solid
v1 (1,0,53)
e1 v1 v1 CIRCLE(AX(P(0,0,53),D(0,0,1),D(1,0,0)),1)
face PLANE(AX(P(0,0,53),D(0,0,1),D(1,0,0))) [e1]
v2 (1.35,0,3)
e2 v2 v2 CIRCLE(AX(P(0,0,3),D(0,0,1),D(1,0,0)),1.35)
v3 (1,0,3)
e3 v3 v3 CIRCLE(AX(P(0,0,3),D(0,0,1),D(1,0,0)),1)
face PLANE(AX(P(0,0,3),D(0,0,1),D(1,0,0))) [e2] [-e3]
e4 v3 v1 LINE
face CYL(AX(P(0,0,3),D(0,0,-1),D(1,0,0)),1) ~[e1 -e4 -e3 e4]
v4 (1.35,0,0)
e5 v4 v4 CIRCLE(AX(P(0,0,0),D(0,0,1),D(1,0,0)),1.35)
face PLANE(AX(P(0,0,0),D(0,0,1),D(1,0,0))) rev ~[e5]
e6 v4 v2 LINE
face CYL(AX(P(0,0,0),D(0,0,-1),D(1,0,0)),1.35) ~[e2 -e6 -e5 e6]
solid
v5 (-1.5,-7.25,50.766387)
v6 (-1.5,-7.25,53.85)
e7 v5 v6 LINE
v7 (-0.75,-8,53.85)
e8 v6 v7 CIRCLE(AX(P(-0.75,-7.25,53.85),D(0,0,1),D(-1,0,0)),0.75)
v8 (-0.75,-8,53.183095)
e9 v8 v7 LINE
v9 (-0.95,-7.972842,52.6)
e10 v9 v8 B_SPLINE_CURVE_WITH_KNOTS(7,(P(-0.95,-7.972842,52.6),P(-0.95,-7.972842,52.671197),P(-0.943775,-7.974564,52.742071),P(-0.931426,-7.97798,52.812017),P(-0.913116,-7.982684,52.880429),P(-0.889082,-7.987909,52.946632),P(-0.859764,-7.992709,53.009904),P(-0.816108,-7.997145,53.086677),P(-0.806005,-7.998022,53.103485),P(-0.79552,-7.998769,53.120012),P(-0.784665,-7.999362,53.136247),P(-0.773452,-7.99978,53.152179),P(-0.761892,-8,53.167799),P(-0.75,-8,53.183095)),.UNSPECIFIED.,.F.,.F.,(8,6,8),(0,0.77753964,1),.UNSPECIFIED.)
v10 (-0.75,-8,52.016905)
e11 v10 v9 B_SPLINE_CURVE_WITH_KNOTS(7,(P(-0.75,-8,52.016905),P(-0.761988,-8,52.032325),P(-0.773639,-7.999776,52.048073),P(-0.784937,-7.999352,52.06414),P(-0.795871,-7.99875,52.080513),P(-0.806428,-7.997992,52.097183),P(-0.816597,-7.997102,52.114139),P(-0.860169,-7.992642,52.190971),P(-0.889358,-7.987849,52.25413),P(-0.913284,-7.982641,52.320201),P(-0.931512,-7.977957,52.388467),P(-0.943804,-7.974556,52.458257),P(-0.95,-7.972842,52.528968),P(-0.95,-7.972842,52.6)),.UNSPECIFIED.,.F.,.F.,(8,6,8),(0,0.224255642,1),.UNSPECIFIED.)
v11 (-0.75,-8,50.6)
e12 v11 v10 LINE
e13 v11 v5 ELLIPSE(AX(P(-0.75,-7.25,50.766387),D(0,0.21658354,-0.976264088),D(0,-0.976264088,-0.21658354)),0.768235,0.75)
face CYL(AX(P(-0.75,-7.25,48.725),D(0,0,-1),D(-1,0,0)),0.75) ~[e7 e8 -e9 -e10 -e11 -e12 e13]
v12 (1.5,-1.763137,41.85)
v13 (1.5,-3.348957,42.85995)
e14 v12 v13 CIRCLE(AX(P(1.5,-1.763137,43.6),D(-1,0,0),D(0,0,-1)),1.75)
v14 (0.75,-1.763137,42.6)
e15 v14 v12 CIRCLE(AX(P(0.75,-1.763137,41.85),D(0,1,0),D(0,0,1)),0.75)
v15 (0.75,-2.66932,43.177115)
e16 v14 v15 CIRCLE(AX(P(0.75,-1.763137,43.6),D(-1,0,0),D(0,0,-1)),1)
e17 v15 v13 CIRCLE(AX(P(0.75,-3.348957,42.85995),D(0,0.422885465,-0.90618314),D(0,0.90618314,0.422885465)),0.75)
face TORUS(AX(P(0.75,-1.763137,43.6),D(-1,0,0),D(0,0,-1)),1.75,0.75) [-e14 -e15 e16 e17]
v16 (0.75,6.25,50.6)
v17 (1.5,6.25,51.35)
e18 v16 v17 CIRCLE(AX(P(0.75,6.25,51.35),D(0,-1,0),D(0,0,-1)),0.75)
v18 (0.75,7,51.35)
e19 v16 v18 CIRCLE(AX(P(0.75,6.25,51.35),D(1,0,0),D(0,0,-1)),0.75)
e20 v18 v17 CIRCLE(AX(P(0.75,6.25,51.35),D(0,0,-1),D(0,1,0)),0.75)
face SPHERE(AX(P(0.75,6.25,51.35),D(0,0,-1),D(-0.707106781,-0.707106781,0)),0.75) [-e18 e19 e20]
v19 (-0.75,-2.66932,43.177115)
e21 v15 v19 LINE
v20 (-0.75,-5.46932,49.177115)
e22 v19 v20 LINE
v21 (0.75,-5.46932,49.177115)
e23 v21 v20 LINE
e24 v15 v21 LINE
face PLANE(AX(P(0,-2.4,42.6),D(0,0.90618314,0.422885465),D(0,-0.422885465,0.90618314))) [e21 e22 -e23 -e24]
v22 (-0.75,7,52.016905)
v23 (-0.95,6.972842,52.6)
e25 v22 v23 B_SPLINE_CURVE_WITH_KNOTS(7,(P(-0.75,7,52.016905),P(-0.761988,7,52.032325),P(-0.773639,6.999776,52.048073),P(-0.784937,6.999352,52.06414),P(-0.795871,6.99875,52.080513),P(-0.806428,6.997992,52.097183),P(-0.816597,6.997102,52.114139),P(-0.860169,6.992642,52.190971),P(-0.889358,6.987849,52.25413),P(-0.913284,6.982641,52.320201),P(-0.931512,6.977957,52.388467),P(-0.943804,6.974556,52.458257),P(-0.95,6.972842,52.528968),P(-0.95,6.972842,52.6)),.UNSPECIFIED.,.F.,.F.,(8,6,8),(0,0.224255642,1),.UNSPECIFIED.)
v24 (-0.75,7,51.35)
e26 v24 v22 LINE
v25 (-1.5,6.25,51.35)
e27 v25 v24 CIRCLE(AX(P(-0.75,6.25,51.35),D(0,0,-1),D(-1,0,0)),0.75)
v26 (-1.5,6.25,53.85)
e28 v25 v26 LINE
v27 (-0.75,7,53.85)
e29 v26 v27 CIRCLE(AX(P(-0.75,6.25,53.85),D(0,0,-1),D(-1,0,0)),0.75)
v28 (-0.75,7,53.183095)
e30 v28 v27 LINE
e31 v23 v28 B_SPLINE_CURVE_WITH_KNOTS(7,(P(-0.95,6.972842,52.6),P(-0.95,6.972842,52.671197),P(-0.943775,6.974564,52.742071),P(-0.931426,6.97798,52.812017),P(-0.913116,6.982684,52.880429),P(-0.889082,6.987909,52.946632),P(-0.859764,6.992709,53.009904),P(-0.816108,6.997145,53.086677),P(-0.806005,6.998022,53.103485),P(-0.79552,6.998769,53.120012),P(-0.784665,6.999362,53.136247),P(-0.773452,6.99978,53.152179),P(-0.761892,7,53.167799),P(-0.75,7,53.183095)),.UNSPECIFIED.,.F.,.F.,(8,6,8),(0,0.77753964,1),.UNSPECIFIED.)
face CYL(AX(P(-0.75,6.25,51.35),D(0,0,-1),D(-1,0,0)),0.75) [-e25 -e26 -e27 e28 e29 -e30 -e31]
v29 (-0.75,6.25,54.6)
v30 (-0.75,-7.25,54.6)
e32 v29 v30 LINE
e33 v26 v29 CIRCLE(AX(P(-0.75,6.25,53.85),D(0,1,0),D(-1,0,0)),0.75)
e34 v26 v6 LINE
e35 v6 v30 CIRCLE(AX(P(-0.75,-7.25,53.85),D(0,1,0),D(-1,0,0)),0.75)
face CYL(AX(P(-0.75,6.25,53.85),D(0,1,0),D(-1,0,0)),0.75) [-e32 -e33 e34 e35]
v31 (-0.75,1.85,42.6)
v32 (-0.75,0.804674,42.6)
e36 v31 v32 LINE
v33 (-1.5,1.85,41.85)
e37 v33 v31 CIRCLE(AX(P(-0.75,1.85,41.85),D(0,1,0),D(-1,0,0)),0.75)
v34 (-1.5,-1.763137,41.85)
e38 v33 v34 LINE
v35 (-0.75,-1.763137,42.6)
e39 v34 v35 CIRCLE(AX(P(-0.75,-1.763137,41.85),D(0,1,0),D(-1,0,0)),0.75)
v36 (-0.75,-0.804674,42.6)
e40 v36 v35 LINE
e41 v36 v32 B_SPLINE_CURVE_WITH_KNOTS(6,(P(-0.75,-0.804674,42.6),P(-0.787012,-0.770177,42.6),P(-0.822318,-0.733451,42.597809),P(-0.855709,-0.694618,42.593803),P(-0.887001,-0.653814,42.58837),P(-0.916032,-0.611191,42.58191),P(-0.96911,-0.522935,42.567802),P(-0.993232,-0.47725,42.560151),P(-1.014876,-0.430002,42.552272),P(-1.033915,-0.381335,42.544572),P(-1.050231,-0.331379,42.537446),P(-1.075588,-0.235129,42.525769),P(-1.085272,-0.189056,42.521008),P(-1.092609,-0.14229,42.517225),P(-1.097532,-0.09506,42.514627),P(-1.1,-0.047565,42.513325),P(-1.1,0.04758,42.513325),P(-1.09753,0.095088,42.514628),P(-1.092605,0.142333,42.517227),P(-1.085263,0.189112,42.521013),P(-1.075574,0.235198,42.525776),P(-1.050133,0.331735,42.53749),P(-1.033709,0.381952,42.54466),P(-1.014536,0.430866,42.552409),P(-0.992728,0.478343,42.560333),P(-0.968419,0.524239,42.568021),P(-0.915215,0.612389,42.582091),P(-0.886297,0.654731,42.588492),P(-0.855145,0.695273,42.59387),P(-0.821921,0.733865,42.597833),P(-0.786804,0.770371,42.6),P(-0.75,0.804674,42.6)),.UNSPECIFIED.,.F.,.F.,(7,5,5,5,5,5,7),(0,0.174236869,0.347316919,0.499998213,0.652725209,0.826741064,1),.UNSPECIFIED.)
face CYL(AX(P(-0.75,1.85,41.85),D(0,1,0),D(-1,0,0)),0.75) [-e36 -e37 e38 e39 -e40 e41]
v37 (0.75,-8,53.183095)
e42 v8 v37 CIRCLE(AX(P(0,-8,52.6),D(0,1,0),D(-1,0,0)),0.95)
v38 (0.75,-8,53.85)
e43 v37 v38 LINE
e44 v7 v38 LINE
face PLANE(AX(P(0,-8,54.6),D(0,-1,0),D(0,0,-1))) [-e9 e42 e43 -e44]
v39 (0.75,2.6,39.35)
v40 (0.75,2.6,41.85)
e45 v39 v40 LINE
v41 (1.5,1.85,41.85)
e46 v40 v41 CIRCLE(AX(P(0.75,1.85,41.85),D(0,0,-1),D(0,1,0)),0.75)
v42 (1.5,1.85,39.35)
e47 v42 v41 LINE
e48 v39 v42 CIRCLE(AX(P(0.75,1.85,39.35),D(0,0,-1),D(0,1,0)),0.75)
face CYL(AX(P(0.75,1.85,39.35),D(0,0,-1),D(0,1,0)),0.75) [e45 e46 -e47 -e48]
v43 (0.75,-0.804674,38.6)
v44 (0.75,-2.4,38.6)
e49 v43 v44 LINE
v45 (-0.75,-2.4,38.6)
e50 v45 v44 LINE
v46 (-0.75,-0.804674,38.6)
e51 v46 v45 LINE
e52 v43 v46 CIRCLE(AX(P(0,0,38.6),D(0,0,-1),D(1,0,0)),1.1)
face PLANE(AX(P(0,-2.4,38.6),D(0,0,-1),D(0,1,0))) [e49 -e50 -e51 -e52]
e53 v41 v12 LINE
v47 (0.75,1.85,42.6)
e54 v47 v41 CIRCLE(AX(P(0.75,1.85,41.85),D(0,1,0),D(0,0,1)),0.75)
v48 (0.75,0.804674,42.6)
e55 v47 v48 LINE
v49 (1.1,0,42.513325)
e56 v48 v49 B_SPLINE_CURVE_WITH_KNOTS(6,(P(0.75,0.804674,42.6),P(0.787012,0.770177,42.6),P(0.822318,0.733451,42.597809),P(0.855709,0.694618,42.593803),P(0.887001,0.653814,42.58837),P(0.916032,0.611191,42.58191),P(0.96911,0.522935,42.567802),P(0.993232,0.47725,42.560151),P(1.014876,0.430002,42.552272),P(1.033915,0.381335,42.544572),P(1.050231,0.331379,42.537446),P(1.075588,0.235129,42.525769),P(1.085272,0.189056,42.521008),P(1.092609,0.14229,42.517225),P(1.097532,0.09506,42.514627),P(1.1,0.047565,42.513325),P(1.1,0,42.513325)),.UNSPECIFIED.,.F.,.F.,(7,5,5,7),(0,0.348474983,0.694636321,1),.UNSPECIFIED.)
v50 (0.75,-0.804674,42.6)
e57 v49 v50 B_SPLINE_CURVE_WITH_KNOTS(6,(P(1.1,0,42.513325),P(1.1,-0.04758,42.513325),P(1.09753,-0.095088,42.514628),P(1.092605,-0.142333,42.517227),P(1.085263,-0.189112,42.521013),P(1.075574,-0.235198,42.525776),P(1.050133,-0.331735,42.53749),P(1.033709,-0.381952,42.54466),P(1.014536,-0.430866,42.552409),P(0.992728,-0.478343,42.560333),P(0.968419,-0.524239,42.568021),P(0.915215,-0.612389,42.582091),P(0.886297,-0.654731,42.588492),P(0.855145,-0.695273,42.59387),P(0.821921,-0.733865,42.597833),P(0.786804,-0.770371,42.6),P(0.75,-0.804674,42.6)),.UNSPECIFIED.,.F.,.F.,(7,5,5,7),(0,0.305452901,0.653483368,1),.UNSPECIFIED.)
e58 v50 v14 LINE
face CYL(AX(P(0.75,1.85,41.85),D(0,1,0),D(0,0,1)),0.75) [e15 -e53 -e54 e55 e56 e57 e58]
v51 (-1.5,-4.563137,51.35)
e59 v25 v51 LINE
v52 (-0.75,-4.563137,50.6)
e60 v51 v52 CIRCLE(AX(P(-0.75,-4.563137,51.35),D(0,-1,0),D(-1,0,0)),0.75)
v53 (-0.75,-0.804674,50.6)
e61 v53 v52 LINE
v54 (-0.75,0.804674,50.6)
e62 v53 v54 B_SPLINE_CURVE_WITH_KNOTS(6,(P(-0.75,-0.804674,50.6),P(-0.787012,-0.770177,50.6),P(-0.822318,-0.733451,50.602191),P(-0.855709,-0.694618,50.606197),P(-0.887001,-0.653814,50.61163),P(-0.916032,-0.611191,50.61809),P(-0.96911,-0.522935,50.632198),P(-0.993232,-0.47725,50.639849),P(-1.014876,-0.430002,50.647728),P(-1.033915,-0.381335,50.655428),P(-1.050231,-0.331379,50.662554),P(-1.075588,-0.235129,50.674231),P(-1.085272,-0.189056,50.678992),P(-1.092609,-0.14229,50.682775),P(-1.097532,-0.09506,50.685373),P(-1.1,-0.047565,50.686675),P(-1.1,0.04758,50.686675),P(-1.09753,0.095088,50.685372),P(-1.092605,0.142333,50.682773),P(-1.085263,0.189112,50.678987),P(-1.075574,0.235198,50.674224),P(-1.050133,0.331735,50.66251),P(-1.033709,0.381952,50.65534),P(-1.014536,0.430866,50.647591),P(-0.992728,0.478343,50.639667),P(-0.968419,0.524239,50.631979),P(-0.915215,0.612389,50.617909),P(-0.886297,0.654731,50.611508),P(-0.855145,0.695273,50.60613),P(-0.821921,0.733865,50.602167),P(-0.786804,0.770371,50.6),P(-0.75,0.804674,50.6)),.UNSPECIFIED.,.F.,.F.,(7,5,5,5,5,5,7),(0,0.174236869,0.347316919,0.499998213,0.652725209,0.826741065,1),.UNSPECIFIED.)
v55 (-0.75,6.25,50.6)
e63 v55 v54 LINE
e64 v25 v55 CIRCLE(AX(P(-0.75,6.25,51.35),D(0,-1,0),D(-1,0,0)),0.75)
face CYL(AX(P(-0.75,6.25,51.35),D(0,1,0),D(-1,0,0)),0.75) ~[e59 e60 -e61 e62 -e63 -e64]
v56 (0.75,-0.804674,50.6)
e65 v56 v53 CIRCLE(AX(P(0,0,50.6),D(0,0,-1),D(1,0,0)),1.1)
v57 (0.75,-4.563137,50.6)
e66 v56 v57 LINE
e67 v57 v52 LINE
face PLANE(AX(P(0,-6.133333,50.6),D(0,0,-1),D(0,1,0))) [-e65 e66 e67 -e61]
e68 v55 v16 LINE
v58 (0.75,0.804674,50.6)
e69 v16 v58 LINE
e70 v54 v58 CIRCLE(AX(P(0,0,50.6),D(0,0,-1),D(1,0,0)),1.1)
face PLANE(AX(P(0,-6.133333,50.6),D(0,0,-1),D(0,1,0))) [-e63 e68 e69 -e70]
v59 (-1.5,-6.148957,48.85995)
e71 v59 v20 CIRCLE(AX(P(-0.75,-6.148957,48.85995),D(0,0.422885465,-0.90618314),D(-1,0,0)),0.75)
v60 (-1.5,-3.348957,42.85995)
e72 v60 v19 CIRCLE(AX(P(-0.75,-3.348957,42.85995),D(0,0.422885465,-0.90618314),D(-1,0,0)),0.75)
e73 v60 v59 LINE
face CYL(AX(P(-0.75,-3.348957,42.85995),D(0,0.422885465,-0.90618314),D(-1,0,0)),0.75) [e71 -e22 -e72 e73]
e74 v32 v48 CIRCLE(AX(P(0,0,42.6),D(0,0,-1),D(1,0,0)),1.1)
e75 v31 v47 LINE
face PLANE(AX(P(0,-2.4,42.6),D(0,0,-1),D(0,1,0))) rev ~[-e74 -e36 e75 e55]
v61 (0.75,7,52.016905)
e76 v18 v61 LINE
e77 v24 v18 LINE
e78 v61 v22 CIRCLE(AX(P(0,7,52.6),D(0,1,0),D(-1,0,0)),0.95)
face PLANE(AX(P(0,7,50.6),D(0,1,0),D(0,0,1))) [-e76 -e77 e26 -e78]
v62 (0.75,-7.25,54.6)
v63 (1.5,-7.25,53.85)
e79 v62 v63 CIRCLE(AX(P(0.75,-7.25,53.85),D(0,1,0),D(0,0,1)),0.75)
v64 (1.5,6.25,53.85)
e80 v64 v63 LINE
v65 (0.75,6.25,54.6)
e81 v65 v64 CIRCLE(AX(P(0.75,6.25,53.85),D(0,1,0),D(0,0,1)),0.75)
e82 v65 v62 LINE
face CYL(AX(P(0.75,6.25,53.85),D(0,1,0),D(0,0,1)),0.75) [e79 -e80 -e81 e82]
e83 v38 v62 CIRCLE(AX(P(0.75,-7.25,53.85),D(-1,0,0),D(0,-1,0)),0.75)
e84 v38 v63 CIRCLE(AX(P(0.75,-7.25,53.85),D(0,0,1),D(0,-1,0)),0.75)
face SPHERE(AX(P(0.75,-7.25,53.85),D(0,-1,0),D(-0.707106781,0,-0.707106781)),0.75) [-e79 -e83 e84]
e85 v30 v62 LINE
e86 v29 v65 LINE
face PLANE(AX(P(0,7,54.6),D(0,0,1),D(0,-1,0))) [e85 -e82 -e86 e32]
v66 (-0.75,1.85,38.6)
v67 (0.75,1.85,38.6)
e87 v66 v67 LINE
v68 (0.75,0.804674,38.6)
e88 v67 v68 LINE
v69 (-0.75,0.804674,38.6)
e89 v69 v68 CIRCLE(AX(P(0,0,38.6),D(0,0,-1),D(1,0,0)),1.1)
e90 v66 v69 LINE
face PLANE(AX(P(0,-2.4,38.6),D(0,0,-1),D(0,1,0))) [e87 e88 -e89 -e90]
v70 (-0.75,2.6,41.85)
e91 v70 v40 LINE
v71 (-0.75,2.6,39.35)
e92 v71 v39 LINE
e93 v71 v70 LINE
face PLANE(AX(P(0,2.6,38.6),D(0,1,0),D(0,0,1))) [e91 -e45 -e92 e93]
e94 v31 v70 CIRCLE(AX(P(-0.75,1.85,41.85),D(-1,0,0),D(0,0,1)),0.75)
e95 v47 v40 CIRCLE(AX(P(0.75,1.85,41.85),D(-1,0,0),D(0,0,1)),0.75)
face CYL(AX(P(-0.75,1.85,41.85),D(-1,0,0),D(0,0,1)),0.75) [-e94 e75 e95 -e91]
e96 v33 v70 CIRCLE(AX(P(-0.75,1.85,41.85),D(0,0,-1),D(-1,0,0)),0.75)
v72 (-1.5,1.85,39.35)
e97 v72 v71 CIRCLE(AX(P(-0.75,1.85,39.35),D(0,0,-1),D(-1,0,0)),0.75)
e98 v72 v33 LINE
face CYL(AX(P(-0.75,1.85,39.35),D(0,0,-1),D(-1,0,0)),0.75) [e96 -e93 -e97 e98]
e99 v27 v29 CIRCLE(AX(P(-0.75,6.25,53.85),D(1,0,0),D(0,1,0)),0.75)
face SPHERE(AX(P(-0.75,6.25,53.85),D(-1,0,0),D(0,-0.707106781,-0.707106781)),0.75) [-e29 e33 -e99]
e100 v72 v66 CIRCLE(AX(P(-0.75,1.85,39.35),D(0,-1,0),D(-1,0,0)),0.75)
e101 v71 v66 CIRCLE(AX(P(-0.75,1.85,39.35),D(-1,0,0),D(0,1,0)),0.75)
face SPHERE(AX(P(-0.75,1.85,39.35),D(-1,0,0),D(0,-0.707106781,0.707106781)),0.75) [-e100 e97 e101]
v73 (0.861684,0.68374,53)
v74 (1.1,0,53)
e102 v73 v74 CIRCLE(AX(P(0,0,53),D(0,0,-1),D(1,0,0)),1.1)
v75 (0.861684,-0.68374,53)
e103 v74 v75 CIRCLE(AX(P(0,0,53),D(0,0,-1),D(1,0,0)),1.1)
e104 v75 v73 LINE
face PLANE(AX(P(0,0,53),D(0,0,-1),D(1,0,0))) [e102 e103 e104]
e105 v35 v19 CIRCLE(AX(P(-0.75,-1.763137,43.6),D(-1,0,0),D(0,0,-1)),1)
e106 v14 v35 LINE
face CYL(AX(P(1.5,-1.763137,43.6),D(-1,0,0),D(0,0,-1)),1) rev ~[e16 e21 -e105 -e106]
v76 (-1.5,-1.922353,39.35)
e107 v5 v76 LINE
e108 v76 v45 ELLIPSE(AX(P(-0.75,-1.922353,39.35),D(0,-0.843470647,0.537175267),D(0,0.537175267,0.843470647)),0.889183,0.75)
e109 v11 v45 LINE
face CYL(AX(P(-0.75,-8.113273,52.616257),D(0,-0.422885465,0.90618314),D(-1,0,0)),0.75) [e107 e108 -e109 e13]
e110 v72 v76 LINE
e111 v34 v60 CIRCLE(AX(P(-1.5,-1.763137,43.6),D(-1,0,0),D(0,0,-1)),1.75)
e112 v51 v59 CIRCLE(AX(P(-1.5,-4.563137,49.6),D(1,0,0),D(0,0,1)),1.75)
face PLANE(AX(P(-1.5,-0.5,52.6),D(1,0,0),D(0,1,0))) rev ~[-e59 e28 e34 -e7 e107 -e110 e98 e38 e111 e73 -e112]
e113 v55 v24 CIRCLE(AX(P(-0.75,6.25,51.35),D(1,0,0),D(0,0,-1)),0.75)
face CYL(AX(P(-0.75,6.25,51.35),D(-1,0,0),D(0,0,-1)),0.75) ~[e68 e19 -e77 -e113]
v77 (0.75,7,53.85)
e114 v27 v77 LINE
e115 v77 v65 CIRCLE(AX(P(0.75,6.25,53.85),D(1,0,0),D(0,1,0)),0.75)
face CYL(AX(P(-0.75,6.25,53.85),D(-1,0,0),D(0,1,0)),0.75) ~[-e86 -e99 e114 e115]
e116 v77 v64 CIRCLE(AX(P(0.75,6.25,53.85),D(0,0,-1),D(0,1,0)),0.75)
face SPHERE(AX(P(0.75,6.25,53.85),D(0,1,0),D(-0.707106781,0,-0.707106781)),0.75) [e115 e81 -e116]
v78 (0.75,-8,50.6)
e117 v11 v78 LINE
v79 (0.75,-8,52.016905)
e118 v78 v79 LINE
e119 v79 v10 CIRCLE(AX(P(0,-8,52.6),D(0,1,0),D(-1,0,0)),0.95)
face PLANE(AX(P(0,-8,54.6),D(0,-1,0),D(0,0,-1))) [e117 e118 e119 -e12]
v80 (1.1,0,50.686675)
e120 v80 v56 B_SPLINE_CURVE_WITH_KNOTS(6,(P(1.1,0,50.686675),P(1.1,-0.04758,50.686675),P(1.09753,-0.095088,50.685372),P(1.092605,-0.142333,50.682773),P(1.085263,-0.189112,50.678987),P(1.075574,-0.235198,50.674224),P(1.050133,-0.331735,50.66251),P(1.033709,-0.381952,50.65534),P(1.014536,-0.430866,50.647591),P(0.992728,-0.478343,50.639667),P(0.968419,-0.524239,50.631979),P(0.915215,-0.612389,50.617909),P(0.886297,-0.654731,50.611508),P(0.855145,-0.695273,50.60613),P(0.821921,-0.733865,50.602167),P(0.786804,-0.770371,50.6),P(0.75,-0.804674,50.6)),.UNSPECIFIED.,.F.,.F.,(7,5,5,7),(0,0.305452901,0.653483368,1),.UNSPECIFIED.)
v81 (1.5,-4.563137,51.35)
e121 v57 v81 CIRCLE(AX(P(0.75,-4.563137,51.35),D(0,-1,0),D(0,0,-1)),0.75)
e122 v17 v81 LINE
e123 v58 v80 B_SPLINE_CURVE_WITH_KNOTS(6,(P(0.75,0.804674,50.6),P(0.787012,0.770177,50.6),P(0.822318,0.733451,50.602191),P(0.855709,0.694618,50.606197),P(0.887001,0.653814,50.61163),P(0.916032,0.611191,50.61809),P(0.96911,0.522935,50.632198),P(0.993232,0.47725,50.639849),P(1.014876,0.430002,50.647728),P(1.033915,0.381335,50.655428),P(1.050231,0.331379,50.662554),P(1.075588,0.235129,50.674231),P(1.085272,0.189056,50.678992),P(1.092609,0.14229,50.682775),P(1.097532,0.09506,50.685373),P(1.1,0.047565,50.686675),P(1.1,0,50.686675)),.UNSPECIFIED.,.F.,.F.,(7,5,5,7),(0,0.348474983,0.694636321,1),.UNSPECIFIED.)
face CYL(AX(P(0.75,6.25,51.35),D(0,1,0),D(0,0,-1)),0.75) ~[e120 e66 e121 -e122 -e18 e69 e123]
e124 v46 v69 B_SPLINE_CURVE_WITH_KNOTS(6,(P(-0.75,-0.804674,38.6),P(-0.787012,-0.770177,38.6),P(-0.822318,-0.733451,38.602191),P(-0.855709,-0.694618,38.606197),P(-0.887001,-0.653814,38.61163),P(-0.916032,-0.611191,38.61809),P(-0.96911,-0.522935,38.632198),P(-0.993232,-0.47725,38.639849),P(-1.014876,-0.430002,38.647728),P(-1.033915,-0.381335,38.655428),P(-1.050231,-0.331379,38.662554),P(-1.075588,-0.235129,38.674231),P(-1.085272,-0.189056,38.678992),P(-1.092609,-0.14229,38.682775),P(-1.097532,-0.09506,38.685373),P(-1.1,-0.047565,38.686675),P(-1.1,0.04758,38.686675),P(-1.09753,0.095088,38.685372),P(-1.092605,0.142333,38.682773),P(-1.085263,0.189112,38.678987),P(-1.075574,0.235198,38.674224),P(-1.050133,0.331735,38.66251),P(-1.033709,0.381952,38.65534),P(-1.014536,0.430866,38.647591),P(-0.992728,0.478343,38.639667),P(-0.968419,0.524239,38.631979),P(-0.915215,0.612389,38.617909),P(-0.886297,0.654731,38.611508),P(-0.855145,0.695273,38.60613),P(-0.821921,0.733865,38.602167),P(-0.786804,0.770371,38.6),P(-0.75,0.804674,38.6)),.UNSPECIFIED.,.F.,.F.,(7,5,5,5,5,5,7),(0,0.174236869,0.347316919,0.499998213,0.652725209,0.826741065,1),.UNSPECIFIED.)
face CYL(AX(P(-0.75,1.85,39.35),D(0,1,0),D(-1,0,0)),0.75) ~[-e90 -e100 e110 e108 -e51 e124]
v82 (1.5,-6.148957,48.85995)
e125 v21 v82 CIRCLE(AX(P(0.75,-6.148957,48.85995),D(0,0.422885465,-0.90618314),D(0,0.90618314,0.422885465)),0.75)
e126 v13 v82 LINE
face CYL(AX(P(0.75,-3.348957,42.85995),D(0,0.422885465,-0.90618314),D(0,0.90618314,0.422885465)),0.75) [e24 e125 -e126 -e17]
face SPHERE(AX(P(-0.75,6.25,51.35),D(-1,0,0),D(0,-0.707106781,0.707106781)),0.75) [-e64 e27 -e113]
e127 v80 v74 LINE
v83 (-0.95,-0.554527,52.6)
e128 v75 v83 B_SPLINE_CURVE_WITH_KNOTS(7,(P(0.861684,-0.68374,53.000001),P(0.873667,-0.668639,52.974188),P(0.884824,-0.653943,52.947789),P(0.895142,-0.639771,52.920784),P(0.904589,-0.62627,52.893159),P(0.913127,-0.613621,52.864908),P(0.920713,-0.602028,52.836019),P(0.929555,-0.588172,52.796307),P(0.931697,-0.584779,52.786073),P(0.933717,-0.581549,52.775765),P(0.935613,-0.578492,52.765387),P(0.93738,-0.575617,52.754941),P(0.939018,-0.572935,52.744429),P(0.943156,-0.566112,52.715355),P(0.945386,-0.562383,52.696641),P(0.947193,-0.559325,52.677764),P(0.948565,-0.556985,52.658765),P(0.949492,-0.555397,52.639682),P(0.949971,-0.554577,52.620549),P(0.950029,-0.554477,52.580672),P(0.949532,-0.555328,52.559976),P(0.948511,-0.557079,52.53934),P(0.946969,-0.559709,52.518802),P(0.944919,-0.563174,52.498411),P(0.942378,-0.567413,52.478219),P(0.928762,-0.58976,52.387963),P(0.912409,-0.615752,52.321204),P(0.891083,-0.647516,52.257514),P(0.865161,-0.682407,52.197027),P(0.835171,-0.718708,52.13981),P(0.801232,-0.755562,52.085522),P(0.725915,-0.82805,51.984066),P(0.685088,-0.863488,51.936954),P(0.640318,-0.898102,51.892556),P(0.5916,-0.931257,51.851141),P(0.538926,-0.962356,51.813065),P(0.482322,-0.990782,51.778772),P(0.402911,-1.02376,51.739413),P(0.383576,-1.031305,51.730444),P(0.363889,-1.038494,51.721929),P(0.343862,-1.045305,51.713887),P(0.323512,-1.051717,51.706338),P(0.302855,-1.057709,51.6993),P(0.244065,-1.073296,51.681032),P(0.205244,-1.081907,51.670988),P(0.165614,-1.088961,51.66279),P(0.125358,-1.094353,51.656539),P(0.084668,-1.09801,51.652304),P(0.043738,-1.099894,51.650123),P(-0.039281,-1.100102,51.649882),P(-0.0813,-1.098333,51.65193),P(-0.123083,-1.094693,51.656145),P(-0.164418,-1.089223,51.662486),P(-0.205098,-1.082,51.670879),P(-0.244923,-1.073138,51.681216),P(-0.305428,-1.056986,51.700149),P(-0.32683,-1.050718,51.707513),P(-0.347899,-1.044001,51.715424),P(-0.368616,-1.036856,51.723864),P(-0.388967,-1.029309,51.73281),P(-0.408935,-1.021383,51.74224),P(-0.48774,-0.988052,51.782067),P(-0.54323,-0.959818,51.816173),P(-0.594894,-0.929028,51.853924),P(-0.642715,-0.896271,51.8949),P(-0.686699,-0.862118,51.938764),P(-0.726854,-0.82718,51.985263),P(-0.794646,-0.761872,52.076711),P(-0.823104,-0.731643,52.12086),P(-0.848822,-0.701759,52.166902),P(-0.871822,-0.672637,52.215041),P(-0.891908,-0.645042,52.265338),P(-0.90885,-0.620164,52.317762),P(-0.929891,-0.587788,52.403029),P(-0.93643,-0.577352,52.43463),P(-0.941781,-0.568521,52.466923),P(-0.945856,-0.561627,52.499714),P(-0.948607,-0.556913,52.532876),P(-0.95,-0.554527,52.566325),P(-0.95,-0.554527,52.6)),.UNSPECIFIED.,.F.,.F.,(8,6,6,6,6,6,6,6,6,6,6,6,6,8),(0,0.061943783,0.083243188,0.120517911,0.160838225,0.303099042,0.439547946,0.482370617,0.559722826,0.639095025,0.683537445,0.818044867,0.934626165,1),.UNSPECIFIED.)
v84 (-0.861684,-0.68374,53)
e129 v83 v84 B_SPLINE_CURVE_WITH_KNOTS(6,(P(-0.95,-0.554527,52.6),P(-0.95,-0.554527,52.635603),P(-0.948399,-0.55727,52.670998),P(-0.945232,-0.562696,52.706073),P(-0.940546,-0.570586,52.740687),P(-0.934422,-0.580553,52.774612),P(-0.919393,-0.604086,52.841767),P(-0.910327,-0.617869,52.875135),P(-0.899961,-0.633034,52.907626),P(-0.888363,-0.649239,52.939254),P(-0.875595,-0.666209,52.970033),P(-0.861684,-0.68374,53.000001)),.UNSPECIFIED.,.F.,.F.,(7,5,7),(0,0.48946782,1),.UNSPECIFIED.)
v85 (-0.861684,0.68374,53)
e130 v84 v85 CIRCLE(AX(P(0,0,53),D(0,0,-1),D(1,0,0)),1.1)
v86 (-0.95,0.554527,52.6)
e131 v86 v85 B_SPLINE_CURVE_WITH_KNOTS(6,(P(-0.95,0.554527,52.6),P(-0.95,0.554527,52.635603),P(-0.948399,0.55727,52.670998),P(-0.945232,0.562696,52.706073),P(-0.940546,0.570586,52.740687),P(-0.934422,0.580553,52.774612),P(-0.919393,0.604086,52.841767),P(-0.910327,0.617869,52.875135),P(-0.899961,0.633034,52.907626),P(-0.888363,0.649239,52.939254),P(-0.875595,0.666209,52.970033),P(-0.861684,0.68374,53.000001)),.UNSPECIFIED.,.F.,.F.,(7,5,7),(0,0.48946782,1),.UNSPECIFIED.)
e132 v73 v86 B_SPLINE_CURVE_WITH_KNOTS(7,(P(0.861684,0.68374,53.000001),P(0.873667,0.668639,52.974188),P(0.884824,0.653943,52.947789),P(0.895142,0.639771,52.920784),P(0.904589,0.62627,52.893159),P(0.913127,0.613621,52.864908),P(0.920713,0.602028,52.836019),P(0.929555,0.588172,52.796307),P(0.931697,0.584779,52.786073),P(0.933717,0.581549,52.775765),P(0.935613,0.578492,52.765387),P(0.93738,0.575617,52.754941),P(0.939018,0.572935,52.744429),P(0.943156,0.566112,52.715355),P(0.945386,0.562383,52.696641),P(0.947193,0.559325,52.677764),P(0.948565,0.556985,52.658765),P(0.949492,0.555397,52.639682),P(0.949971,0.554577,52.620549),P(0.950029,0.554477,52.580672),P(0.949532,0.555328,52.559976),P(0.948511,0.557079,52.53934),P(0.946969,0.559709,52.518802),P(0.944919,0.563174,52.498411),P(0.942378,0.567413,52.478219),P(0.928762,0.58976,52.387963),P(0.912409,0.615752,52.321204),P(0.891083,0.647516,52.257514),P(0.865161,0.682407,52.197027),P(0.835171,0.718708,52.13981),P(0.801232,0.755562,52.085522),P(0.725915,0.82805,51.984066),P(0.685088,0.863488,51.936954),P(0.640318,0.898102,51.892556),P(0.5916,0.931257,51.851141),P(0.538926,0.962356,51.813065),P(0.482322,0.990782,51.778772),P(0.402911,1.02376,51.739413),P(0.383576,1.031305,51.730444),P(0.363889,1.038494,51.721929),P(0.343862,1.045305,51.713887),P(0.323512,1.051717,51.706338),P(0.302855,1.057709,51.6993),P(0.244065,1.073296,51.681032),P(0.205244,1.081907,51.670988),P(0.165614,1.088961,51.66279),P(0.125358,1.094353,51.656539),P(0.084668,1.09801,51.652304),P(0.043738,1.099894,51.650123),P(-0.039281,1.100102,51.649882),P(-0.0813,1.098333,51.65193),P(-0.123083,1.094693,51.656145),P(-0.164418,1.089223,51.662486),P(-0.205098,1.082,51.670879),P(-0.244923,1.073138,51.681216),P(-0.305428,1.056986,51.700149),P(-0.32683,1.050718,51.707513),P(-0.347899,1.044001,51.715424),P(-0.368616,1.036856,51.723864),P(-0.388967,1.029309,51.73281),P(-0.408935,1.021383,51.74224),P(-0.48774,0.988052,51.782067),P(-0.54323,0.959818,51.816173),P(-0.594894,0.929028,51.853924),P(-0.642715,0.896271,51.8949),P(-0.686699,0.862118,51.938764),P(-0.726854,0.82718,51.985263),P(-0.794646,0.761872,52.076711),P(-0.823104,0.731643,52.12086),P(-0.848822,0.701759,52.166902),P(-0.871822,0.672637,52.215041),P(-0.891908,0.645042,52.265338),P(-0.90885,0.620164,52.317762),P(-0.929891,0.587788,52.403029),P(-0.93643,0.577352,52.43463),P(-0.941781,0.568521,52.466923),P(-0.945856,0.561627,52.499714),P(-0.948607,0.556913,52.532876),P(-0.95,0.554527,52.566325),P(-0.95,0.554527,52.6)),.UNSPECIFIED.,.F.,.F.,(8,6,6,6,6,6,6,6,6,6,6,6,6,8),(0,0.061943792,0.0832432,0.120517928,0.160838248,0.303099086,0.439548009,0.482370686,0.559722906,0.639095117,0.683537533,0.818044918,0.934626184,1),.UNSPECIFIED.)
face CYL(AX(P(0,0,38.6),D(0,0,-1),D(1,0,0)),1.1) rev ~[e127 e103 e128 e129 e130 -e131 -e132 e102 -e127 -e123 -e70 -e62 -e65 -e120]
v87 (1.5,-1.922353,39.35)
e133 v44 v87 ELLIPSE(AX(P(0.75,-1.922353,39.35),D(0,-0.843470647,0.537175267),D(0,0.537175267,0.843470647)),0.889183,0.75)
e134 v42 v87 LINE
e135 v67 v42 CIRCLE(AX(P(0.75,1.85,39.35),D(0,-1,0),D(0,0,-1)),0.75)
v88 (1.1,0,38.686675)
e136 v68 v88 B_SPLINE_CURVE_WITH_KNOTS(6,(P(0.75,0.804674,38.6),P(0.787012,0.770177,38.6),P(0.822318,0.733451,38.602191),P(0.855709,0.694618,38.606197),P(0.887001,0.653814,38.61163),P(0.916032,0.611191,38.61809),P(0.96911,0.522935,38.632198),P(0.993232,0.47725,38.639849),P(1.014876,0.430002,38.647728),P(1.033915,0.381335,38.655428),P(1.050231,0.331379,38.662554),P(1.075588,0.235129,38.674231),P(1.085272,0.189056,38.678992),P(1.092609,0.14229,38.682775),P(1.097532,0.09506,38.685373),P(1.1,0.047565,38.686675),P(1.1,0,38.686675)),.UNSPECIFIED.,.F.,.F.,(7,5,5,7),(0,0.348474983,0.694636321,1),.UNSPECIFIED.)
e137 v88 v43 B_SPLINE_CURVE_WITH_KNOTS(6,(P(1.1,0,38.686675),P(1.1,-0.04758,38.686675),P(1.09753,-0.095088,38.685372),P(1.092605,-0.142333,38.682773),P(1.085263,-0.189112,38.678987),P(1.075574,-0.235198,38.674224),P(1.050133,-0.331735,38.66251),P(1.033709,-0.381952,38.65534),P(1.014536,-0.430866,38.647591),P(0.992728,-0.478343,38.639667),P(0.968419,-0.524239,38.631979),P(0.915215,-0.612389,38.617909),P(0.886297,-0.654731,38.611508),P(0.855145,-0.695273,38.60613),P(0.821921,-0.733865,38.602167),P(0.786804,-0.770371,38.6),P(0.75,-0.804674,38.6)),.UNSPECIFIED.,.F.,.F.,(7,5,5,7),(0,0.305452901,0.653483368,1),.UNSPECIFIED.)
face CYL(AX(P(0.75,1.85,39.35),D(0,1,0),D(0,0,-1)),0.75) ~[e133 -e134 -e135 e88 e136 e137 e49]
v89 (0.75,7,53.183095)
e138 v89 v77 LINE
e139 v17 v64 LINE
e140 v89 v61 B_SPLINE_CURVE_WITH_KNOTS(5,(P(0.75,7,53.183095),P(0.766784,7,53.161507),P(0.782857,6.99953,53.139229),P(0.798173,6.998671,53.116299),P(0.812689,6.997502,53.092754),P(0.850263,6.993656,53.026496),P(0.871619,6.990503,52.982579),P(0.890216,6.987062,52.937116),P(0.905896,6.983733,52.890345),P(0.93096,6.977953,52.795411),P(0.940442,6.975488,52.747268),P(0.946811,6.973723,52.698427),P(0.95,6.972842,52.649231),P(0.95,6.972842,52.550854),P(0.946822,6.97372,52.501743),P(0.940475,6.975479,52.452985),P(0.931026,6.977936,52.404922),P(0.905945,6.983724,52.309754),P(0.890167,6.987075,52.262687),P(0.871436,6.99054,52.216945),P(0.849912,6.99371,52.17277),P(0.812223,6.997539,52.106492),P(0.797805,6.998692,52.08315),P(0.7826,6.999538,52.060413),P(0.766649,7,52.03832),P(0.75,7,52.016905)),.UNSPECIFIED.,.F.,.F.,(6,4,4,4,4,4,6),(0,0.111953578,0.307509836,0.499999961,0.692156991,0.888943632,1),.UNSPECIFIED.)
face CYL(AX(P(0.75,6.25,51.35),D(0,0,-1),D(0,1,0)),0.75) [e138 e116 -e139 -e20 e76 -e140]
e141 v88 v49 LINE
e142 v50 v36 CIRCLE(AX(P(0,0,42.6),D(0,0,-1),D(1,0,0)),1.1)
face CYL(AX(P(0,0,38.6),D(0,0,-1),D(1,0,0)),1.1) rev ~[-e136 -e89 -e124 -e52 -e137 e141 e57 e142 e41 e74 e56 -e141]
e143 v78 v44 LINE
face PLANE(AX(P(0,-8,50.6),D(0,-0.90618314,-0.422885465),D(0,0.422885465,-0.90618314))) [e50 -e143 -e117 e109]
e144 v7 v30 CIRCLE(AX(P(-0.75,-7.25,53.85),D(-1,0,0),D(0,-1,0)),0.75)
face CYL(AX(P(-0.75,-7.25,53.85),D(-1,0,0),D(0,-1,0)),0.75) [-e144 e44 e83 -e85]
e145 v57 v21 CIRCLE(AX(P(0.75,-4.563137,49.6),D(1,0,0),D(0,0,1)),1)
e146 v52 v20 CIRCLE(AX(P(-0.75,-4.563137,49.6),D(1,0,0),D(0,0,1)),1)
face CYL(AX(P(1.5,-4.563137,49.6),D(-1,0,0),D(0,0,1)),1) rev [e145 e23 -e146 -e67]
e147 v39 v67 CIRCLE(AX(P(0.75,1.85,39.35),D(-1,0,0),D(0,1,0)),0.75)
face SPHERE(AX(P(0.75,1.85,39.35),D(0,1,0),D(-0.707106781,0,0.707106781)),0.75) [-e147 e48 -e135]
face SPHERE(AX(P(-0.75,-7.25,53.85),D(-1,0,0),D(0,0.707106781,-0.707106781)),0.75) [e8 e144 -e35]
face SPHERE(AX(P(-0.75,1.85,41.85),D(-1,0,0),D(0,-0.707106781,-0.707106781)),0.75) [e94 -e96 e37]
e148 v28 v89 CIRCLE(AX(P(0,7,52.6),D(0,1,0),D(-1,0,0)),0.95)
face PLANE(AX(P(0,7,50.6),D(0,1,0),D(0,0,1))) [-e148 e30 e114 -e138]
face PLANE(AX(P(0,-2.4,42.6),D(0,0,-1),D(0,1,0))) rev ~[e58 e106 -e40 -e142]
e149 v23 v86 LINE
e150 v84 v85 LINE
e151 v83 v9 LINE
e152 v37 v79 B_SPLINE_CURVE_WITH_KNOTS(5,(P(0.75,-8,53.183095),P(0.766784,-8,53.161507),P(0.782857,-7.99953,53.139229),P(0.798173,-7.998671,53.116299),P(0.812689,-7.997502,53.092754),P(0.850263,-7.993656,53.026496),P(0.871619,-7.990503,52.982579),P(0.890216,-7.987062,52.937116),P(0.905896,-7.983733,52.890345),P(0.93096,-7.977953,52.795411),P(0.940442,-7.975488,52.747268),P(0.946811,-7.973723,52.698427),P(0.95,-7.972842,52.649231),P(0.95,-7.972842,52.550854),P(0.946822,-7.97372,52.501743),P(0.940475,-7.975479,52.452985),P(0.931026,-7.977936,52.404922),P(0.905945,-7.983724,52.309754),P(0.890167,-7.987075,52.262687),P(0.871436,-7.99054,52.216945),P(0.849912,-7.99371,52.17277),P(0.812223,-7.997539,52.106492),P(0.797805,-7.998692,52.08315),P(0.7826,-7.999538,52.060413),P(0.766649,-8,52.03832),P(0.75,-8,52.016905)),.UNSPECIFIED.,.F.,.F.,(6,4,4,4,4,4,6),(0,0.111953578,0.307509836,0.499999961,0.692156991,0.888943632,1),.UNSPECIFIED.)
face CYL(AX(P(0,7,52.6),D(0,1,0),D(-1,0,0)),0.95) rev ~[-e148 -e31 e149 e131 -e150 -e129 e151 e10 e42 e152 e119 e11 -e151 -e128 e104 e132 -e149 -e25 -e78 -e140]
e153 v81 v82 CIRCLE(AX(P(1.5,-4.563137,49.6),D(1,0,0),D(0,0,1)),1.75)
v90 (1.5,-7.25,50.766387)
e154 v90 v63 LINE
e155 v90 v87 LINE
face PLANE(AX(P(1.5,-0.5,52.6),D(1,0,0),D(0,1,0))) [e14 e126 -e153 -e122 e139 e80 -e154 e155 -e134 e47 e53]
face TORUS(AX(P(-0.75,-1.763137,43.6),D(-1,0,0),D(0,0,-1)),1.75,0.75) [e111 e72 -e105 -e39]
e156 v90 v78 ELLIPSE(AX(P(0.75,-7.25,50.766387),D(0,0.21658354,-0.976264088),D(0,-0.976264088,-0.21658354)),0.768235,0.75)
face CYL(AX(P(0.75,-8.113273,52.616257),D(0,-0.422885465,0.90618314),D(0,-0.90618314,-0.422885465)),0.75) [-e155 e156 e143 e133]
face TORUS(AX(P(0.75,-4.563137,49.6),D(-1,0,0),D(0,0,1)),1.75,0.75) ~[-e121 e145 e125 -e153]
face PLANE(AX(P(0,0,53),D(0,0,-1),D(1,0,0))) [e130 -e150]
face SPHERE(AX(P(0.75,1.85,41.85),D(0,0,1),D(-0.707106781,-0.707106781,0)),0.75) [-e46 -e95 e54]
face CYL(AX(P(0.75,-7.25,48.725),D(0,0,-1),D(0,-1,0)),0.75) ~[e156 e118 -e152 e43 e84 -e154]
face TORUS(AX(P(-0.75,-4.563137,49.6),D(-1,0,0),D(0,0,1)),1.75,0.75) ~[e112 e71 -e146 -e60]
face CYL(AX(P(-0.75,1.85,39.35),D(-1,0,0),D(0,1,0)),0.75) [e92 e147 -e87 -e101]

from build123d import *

# Parameters (mm, degrees)
F0_R          = 1.35
F1_DEPTH      = 3
F2_R          = 1
F3_DEPTH      = 50
F4_W          = 5
F4_H          = 4
F5_DEPTH      = 1.5
F6_R          = 1.1
F7_DEPTH      = 14.4
F8_R          = 0.95
F9_DEPTH      = 25
F10_R         = 1
F11_T1_DEPTH  = 2.5
F11_T3_DEPTH  = 2.5
F11_T5_DEPTH  = 13.5
F11_T7_DEPTH  = 10.8131369762
F11_T9_DEPTH  = 5.125
F11_T11_DEPTH = 1.5
F11_T13_DEPTH = 16.9923562858
F11_T15_DEPTH = 6.125
F11_T17_DEPTH = 3.6131369762
F11_T19_DEPTH = 6.6211781429
F11_S23_W     = 0.75
F11_S23_H     = 0.75
F11_T24_DEPTH = 0.75
F11_S29_W     = 0.75
F11_S29_H     = 0.75
F11_T30_DEPTH = 0.75
F11_S35_W     = 0.75
F11_S35_H     = 0.75
F11_T36_DEPTH = 0.75
F11_S41_W     = 0.75
F11_S41_H     = 0.75
F11_T42_DEPTH = 0.75
F11_S47_W     = 0.75
F11_S47_H     = 0.75
F11_T48_DEPTH = 0.75
F11_S53_W     = 0.75
F11_S53_H     = 0.75
F11_T54_DEPTH = 0.75
F11_S59_W     = 0.75
F11_S59_H     = 0.75
F11_T60_DEPTH = 0.75
F11_S65_W     = 0.75
F11_S65_H     = 0.75
F11_T66_DEPTH = 0.75
F11_S71_W     = 0.75
F11_S71_H     = 0.75
F11_T72_DEPTH = 0.75
F11_S77_W     = 0.75
F11_S77_H     = 0.75
F11_T78_DEPTH = 0.75
F11_T82_ANGLE = 64.9831065219
F11_T84_ANGLE = 115.0168934781
F11_T86_ANGLE = 64.9831065219
F11_T88_ANGLE = 115.0168934781


# Not quite as in the source:
# - a fillet or chamfer that OpenCascade refuses, or shapes differently, is made with other operations: its cross-section is extruded or revolved along the edge and cut away or added


with BuildPart() as f1:
    # F0 (on Top) → F1 (new body)
    with BuildSketch(Plane.XY):
        Circle(F0_R)
    extrude(amount=F1_DEPTH)

    # F2 (on face) → F3 (join)
    with BuildSketch(Plane.XY.offset(3)):
        Circle(F2_R)
    extrude(amount=F3_DEPTH)


with BuildPart() as f5:
    # F4 (on Right) → F5 (new body, symmetric)
    with BuildSketch(Plane.YZ):
        Polygon((7, 50.6), (7, 54.6), (-8, 54.6), (-8, 50.6), (-6.1333333333, 50.6), align=None)
        with Locations((0.1, 40.6)):
            Rectangle(F4_W, F4_H)
        Polygon((-6.1333333333, 50.6), (-8, 50.6), (-2.4, 38.6), (-2.4, 42.6), align=None)
    extrude(amount=F5_DEPTH, both=True)

    # F6 (on face) → F7 (cut, through all)
    with BuildSketch(Plane(origin=(0, 0, 38.6), x_dir=(1, 0, 0), z_dir=(0, 0, -1))):
        Circle(F6_R)
    extrude(amount=-F7_DEPTH, mode=Mode.SUBTRACT)

    # F8 (on face) → F9 (cut)
    with BuildSketch(Plane(origin=(0, 7, 0), x_dir=(-1, 0, 0), z_dir=(0, 1, 0))):
        with Locations((0, 52.6)):
            Circle(F8_R)
    extrude(amount=-F9_DEPTH, mode=Mode.SUBTRACT)

    # F10
    f10_edges = [f5.edges().sort_by_distance(p)[0] for p in [
        (0, -6.133333, 50.6),
        (0, -2.4, 42.6),
    ]]
    fillet(f10_edges, radius=F10_R)

    # F11: fillet of radius 0.75 on 27 edges, made by hand

    # F11_s2 → F11_t1 (cut)
    with BuildSketch(Plane.XY.offset(39.35)):
        with BuildLine():
            ThreePointArc((-1.5, 1.85), (-1.2803300859, 2.3803300859), (-0.75, 2.6))
            Line((-0.75, 2.6), (-1.5, 2.6))
            Line((-1.5, 2.6), (-1.5, 1.85))
        make_face()
        with BuildLine():
            ThreePointArc((0.75, 2.6), (1.2803300859, 2.3803300859), (1.5, 1.85))
            Line((1.5, 1.85), (1.5, 2.6))
            Line((1.5, 2.6), (0.75, 2.6))
        make_face()
    extrude(amount=F11_T1_DEPTH, mode=Mode.SUBTRACT)

    # F11_s4 → F11_t3 (cut)
    with BuildSketch(Plane.XY.offset(51.35)):
        with BuildLine():
            ThreePointArc((-1.5, 6.25), (-1.2803300859, 6.7803300859), (-0.75, 7))
            Line((-0.75, 7), (-1.5, 7))
            Line((-1.5, 7), (-1.5, 6.25))
        make_face()
        with BuildLine():
            ThreePointArc((0.75, 7), (1.2803300859, 6.7803300859), (1.5, 6.25))
            Line((1.5, 6.25), (1.5, 7))
            Line((1.5, 7), (0.75, 7))
        make_face()
    extrude(amount=F11_T3_DEPTH, mode=Mode.SUBTRACT)

    # F11_s6 → F11_t5 (cut)
    with BuildSketch(Plane.XZ.offset(-6.25)):
        with BuildLine():
            ThreePointArc((-1.5, 53.85), (-1.2803300859, 54.3803300859), (-0.75, 54.6))
            Line((-0.75, 54.6), (-1.5, 54.6))
            Line((-1.5, 54.6), (-1.5, 53.85))
        make_face()
        with BuildLine():
            ThreePointArc((0.75, 54.6), (1.2803300859, 54.3803300859), (1.5, 53.85))
            Line((1.5, 53.85), (1.5, 54.6))
            Line((1.5, 54.6), (0.75, 54.6))
        make_face()
    extrude(amount=F11_T5_DEPTH, mode=Mode.SUBTRACT)

    # F11_s8 → F11_t7 (cut)
    with BuildSketch(Plane.XZ.offset(-6.25)):
        with BuildLine():
            ThreePointArc((-1.5, 51.35), (-1.2803300859, 50.8196699141), (-0.75, 50.6))
            Line((-0.75, 50.6), (-1.5, 50.6))
            Line((-1.5, 50.6), (-1.5, 51.35))
        make_face()
        with BuildLine():
            ThreePointArc((0.75, 50.6), (1.2803300859, 50.8196699141), (1.5, 51.35))
            Line((1.5, 51.35), (1.5, 50.6))
            Line((1.5, 50.6), (0.75, 50.6))
        make_face()
    extrude(amount=F11_T7_DEPTH, mode=Mode.SUBTRACT)

    # F11_s10 → F11_t9 (cut)
    with BuildSketch(Plane.XY.offset(48.725)):
        with BuildLine():
            ThreePointArc((-1.5, -7.25), (-1.2803300859, -7.7803300859), (-0.75, -8))
            Line((-0.75, -8), (-1.5, -8))
            Line((-1.5, -8), (-1.5, -7.25))
        make_face()
        with BuildLine():
            ThreePointArc((0.75, -8), (1.2803300859, -7.7803300859), (1.5, -7.25))
            Line((1.5, -7.25), (1.5, -8))
            Line((1.5, -8), (0.75, -8))
        make_face()
    extrude(amount=F11_T9_DEPTH, mode=Mode.SUBTRACT)

    # F11_s12 → F11_t11 (cut)
    with BuildSketch(Plane.YZ.offset(-0.75)):
        with BuildLine():
            ThreePointArc((-8, 53.85), (-7.7803300859, 54.3803300859), (-7.25, 54.6))
            Line((-7.25, 54.6), (-8, 54.6))
            Line((-8, 54.6), (-8, 53.85))
        make_face()
        with BuildLine():
            ThreePointArc((7, 53.85), (6.7803300859, 54.3803300859), (6.25, 54.6))
            Line((6.25, 54.6), (7, 54.6))
            Line((7, 54.6), (7, 53.85))
        make_face()
        with BuildLine():
            ThreePointArc((6.25, 50.6), (6.7803300859, 50.8196699141), (7, 51.35))
            Line((7, 51.35), (7, 50.6))
            Line((7, 50.6), (6.25, 50.6))
        make_face()
        with BuildLine():
            ThreePointArc((2.6, 39.35), (2.3803300859, 38.8196699141), (1.85, 38.6))
            Line((1.85, 38.6), (2.6, 38.6))
            Line((2.6, 38.6), (2.6, 39.35))
        make_face()
        with BuildLine():
            ThreePointArc((1.85, 42.6), (2.3803300859, 42.3803300859), (2.6, 41.85))
            Line((2.6, 41.85), (2.6, 42.6))
            Line((2.6, 42.6), (1.85, 42.6))
        make_face()
    extrude(amount=F11_T11_DEPTH, mode=Mode.SUBTRACT)

    # F11_s14 → F11_t13 (cut)
    with BuildSketch(Plane(origin=(0, -21.6140781307, 46.3158817087), x_dir=(1, 0, 0), z_dir=(0, 0.4228854653, -0.90618314))):
        with BuildLine():
            ThreePointArc((-1.5, -14.8985394258), (-1.2803300859, -14.3682093399), (-0.75, -14.1485394258))
            Line((-0.75, -14.1485394258), (-1.5, -14.1485394258))
            Line((-1.5, -14.1485394258), (-1.5, -14.8985394258))
        make_face()
        with BuildLine():
            ThreePointArc((0.75, -14.1485394258), (1.2803300859, -14.3682093399), (1.5, -14.8985394258))
            Line((1.5, -14.8985394258), (1.5, -14.1485394258))
            Line((1.5, -14.1485394258), (0.75, -14.1485394258))
        make_face()
    extrude(amount=F11_T13_DEPTH, mode=Mode.SUBTRACT)

    # F11_s16 → F11_t15 (cut)
    with BuildSketch(Plane.XZ.offset(-1.85)):
        with BuildLine():
            ThreePointArc((-1.5, 39.35), (-1.2803300859, 38.8196699141), (-0.75, 38.6))
            Line((-0.75, 38.6), (-1.5, 38.6))
            Line((-1.5, 38.6), (-1.5, 39.35))
        make_face()
        with BuildLine():
            ThreePointArc((0.75, 38.6), (1.2803300859, 38.8196699141), (1.5, 39.35))
            Line((1.5, 39.35), (1.5, 38.6))
            Line((1.5, 38.6), (0.75, 38.6))
        make_face()
    extrude(amount=F11_T15_DEPTH, mode=Mode.SUBTRACT)

    # F11_s18 → F11_t17 (cut)
    with BuildSketch(Plane.XZ.offset(-1.85)):
        with BuildLine():
            ThreePointArc((-1.5, 41.85), (-1.2803300859, 42.3803300859), (-0.75, 42.6))
            Line((-0.75, 42.6), (-1.5, 42.6))
            Line((-1.5, 42.6), (-1.5, 41.85))
        make_face()
        with BuildLine():
            ThreePointArc((0.75, 42.6), (1.2803300859, 42.3803300859), (1.5, 41.85))
            Line((1.5, 41.85), (1.5, 42.6))
            Line((1.5, 42.6), (0.75, 42.6))
        make_face()
    extrude(amount=F11_T17_DEPTH, mode=Mode.SUBTRACT)

    # F11_s20 → F11_t19 (cut)
    with BuildSketch(Plane(origin=(0, -17.0233347147, 36.4785743887), x_dir=(1, 0, 0), z_dir=(0, -0.4228854653, 0.90618314))):
        with BuildLine():
            ThreePointArc((-1.5, 15.0900812871), (-1.2803300859, 15.620411373), (-0.75, 15.8400812871))
            Line((-0.75, 15.8400812871), (-1.5, 15.8400812871))
            Line((-1.5, 15.8400812871), (-1.5, 15.0900812871))
        make_face()
        with BuildLine():
            ThreePointArc((0.75, 15.8400812871), (1.2803300859, 15.620411373), (1.5, 15.0900812871))
            Line((1.5, 15.0900812871), (1.5, 15.8400812871))
            Line((1.5, 15.8400812871), (0.75, 15.8400812871))
        make_face()
    extrude(amount=F11_T19_DEPTH, mode=Mode.SUBTRACT)


with BuildPart() as f11_tool22:
    # F11_s23 → F11_t24 (new body)
    with BuildSketch(Plane.YZ.offset(-0.75)):
        with Locations((2.225, 38.975)):
            Rectangle(F11_S23_W, F11_S23_H)
    extrude(amount=-F11_T24_DEPTH)

    # F11_s25 → F11_t26 (revolve, cut)
    with BuildSketch(Plane(origin=(-0.75, 1.85, 39.35), x_dir=(0, -0.7071067812, 0.7071067812), z_dir=(0, -0.7071067812, -0.7071067812))):
        with BuildLine():
            ThreePointArc((0, -0.75), (0.75, 0), (0, 0.75))
            Line((0, 0.75), (0, -0.75))
        make_face()
    revolve(axis=Axis((-0.75, 1.85, 39.35), (-1, 0, 0)), mode=Mode.SUBTRACT)


with BuildPart() as f5_1:
    add(f5.part)

    # F11_t21: cut F11_tool22
    add(f11_tool22.part, mode=Mode.SUBTRACT)


with BuildPart() as f11_tool28:
    # F11_s29 → F11_t30 (new body)
    with BuildSketch(Plane.YZ.offset(-0.75)):
        with Locations((2.225, 42.225)):
            Rectangle(F11_S29_W, F11_S29_H)
    extrude(amount=-F11_T30_DEPTH)

    # F11_s31 → F11_t32 (revolve, cut)
    with BuildSketch(Plane(origin=(-0.75, 1.85, 41.85), x_dir=(0, -0.7071067812, -0.7071067812), z_dir=(0, 0.7071067812, -0.7071067812))):
        with BuildLine():
            ThreePointArc((0, -0.75), (0.75, 0), (0, 0.75))
            Line((0, 0.75), (0, -0.75))
        make_face()
    revolve(axis=Axis((-0.75, 1.85, 41.85), (-1, 0, 0)), mode=Mode.SUBTRACT)


with BuildPart() as f5_2:
    add(f5_1.part)

    # F11_t27: cut F11_tool28
    add(f11_tool28.part, mode=Mode.SUBTRACT)


with BuildPart() as f11_tool34:
    # F11_s35 → F11_t36 (new body)
    with BuildSketch(Plane.YZ.offset(-0.75)):
        with Locations((6.625, 50.975)):
            Rectangle(F11_S35_W, F11_S35_H)
    extrude(amount=-F11_T36_DEPTH)

    # F11_s37 → F11_t38 (revolve, cut)
    with BuildSketch(Plane(origin=(-0.75, 6.25, 51.35), x_dir=(0, -0.7071067812, 0.7071067812), z_dir=(0, -0.7071067812, -0.7071067812))):
        with BuildLine():
            ThreePointArc((0, -0.75), (0.75, 0), (0, 0.75))
            Line((0, 0.75), (0, -0.75))
        make_face()
    revolve(axis=Axis((-0.75, 6.25, 51.35), (-1, 0, 0)), mode=Mode.SUBTRACT)


with BuildPart() as f5_3:
    add(f5_2.part)

    # F11_t33: cut F11_tool34
    add(f11_tool34.part, mode=Mode.SUBTRACT)


with BuildPart() as f11_tool40:
    # F11_s41 → F11_t42 (new body)
    with BuildSketch(Plane.YZ.offset(-0.75)):
        with Locations((6.625, 54.225)):
            Rectangle(F11_S41_W, F11_S41_H)
    extrude(amount=-F11_T42_DEPTH)

    # F11_s43 → F11_t44 (revolve, cut)
    with BuildSketch(Plane(origin=(-0.75, 6.25, 53.85), x_dir=(0, -0.7071067812, -0.7071067812), z_dir=(0, 0.7071067812, -0.7071067812))):
        with BuildLine():
            ThreePointArc((0, -0.75), (0.75, 0), (0, 0.75))
            Line((0, 0.75), (0, -0.75))
        make_face()
    revolve(axis=Axis((-0.75, 6.25, 53.85), (-1, 0, 0)), mode=Mode.SUBTRACT)


with BuildPart() as f5_4:
    add(f5_3.part)

    # F11_t39: cut F11_tool40
    add(f11_tool40.part, mode=Mode.SUBTRACT)


with BuildPart() as f11_tool46:
    # F11_s47 → F11_t48 (new body)
    with BuildSketch(Plane.XY.offset(51.35)):
        with Locations((1.125, 6.625)):
            Rectangle(F11_S47_W, F11_S47_H)
    extrude(amount=-F11_T48_DEPTH)

    # F11_s49 → F11_t50 (revolve, cut)
    with BuildSketch(Plane(origin=(0.75, 6.25, 51.35), x_dir=(-0.7071067812, -0.7071067812, 0), z_dir=(0.7071067812, -0.7071067812, 0))):
        with BuildLine():
            ThreePointArc((0, -0.75), (0.75, 0), (0, 0.75))
            Line((0, 0.75), (0, -0.75))
        make_face()
    revolve(axis=Axis((0.75, 6.25, 51.35), (0, 0, -1)), mode=Mode.SUBTRACT)


with BuildPart() as f5_5:
    add(f5_4.part)

    # F11_t45: cut F11_tool46
    add(f11_tool46.part, mode=Mode.SUBTRACT)


with BuildPart() as f11_tool52:
    # F11_s53 → F11_t54 (new body)
    with BuildSketch(Plane.XZ.offset(-6.25)):
        with Locations((1.125, 54.225)):
            Rectangle(F11_S53_W, F11_S53_H)
    extrude(amount=-F11_T54_DEPTH)

    # F11_s55 → F11_t56 (revolve, cut)
    with BuildSketch(Plane(origin=(0.75, 6.25, 53.85), x_dir=(-0.7071067812, 0, -0.7071067812), z_dir=(0.7071067812, 0, -0.7071067812))):
        with BuildLine():
            ThreePointArc((0, -0.75), (0.75, 0), (0, 0.75))
            Line((0, 0.75), (0, -0.75))
        make_face()
    revolve(axis=Axis((0.75, 6.25, 53.85), (0, 1, 0)), mode=Mode.SUBTRACT)


with BuildPart() as f5_6:
    add(f5_5.part)

    # F11_t51: cut F11_tool52
    add(f11_tool52.part, mode=Mode.SUBTRACT)


with BuildPart() as f11_tool58:
    # F11_s59 → F11_t60 (new body)
    with BuildSketch(Plane.XZ.offset(-1.85)):
        with Locations((1.125, 38.975)):
            Rectangle(F11_S59_W, F11_S59_H)
    extrude(amount=-F11_T60_DEPTH)

    # F11_s61 → F11_t62 (revolve, cut)
    with BuildSketch(Plane(origin=(0.75, 1.85, 39.35), x_dir=(-0.7071067812, 0, 0.7071067812), z_dir=(-0.7071067812, 0, -0.7071067812))):
        with BuildLine():
            ThreePointArc((0, -0.75), (0.75, 0), (0, 0.75))
            Line((0, 0.75), (0, -0.75))
        make_face()
    revolve(axis=Axis((0.75, 1.85, 39.35), (0, 1, 0)), mode=Mode.SUBTRACT)


with BuildPart() as f5_7:
    add(f5_6.part)

    # F11_t57: cut F11_tool58
    add(f11_tool58.part, mode=Mode.SUBTRACT)


with BuildPart() as f11_tool64:
    # F11_s65 → F11_t66 (new body)
    with BuildSketch(Plane.XY.offset(41.85)):
        with Locations((1.125, 2.225)):
            Rectangle(F11_S65_W, F11_S65_H)
    extrude(amount=F11_T66_DEPTH)

    # F11_s67 → F11_t68 (revolve, cut)
    with BuildSketch(Plane(origin=(0.75, 1.85, 41.85), x_dir=(-0.7071067812, -0.7071067812, 0), z_dir=(-0.7071067812, 0.7071067812, 0))):
        with BuildLine():
            ThreePointArc((0, -0.75), (0.75, 0), (0, 0.75))
            Line((0, 0.75), (0, -0.75))
        make_face()
    revolve(axis=Axis((0.75, 1.85, 41.85), (0, 0, 1)), mode=Mode.SUBTRACT)


with BuildPart() as f5_8:
    add(f5_7.part)

    # F11_t63: cut F11_tool64
    add(f11_tool64.part, mode=Mode.SUBTRACT)


with BuildPart() as f11_tool70:
    # F11_s71 → F11_t72 (new body)
    with BuildSketch(Plane.YZ.offset(-0.75)):
        with Locations((-7.625, 54.225)):
            Rectangle(F11_S71_W, F11_S71_H)
    extrude(amount=-F11_T72_DEPTH)

    # F11_s73 → F11_t74 (revolve, cut)
    with BuildSketch(Plane(origin=(-0.75, -7.25, 53.85), x_dir=(0, 0.7071067812, -0.7071067812), z_dir=(0, 0.7071067812, 0.7071067812))):
        with BuildLine():
            ThreePointArc((0, -0.75), (0.75, 0), (0, 0.75))
            Line((0, 0.75), (0, -0.75))
        make_face()
    revolve(axis=Axis((-0.75, -7.25, 53.85), (-1, 0, 0)), mode=Mode.SUBTRACT)


with BuildPart() as f5_9:
    add(f5_8.part)

    # F11_t69: cut F11_tool70
    add(f11_tool70.part, mode=Mode.SUBTRACT)


with BuildPart() as f11_tool76:
    # F11_s77 → F11_t78 (new body)
    with BuildSketch(Plane.XZ.offset(7.25)):
        with Locations((1.125, 54.225)):
            Rectangle(F11_S77_W, F11_S77_H)
    extrude(amount=F11_T78_DEPTH)

    # F11_s79 → F11_t80 (revolve, cut)
    with BuildSketch(Plane(origin=(0.75, -7.25, 53.85), x_dir=(-0.7071067812, 0, -0.7071067812), z_dir=(-0.7071067812, 0, 0.7071067812))):
        with BuildLine():
            ThreePointArc((0, -0.75), (0.75, 0), (0, 0.75))
            Line((0, 0.75), (0, -0.75))
        make_face()
    revolve(axis=Axis((0.75, -7.25, 53.85), (0, -1, 0)), mode=Mode.SUBTRACT)


with BuildPart() as f5_10:
    add(f5_9.part)

    # F11_t75: cut F11_tool76
    add(f11_tool76.part, mode=Mode.SUBTRACT)

    # F11_s81 → F11_t82 (revolve, cut)
    with BuildSketch(Plane.XZ.offset(1.7631369762)):
        with BuildLine():
            ThreePointArc((-1.5, 41.85), (-1.2803300859, 42.3803300859), (-0.75, 42.6))
            Line((-0.75, 42.6), (-1.5, 42.6))
            Line((-1.5, 42.6), (-1.5, 41.85))
        make_face()
    revolve(axis=Axis((-1.5, -1.7631369762, 43.6), (-1, 0, 0)), revolution_arc=F11_T82_ANGLE, mode=Mode.SUBTRACT)

    # F11_s83 → F11_t84 (revolve, cut)
    with BuildSketch(Plane.XZ.offset(4.5631369762)):
        with BuildLine():
            ThreePointArc((-1.5, 51.35), (-1.2803300859, 50.8196699141), (-0.75, 50.6))
            Line((-0.75, 50.6), (-1.5, 50.6))
            Line((-1.5, 50.6), (-1.5, 51.35))
        make_face()
    revolve(axis=Axis((-1.5, -4.5631369762, 49.6), (1, 0, 0)), revolution_arc=F11_T84_ANGLE, mode=Mode.SUBTRACT)

    # F11_s85 → F11_t86 (revolve, cut)
    with BuildSketch(Plane.XZ.offset(1.7631369762)):
        with BuildLine():
            ThreePointArc((0.75, 42.6), (1.2803300859, 42.3803300859), (1.5, 41.85))
            Line((1.5, 41.85), (1.5, 42.6))
            Line((1.5, 42.6), (0.75, 42.6))
        make_face()
    revolve(axis=Axis((1.5, -1.7631369762, 43.6), (-1, 0, 0)), revolution_arc=F11_T86_ANGLE, mode=Mode.SUBTRACT)

    # F11_s87 → F11_t88 (revolve, cut)
    with BuildSketch(Plane.XZ.offset(4.5631369762)):
        with BuildLine():
            ThreePointArc((0.75, 50.6), (1.2803300859, 50.8196699141), (1.5, 51.35))
            Line((1.5, 51.35), (1.5, 50.6))
            Line((1.5, 50.6), (0.75, 50.6))
        make_face()
    revolve(axis=Axis((1.5, -4.5631369762, 49.6), (1, 0, 0)), revolution_arc=F11_T88_ANGLE, mode=Mode.SUBTRACT)


solid = Compound([f1.part, f5_10.part])
